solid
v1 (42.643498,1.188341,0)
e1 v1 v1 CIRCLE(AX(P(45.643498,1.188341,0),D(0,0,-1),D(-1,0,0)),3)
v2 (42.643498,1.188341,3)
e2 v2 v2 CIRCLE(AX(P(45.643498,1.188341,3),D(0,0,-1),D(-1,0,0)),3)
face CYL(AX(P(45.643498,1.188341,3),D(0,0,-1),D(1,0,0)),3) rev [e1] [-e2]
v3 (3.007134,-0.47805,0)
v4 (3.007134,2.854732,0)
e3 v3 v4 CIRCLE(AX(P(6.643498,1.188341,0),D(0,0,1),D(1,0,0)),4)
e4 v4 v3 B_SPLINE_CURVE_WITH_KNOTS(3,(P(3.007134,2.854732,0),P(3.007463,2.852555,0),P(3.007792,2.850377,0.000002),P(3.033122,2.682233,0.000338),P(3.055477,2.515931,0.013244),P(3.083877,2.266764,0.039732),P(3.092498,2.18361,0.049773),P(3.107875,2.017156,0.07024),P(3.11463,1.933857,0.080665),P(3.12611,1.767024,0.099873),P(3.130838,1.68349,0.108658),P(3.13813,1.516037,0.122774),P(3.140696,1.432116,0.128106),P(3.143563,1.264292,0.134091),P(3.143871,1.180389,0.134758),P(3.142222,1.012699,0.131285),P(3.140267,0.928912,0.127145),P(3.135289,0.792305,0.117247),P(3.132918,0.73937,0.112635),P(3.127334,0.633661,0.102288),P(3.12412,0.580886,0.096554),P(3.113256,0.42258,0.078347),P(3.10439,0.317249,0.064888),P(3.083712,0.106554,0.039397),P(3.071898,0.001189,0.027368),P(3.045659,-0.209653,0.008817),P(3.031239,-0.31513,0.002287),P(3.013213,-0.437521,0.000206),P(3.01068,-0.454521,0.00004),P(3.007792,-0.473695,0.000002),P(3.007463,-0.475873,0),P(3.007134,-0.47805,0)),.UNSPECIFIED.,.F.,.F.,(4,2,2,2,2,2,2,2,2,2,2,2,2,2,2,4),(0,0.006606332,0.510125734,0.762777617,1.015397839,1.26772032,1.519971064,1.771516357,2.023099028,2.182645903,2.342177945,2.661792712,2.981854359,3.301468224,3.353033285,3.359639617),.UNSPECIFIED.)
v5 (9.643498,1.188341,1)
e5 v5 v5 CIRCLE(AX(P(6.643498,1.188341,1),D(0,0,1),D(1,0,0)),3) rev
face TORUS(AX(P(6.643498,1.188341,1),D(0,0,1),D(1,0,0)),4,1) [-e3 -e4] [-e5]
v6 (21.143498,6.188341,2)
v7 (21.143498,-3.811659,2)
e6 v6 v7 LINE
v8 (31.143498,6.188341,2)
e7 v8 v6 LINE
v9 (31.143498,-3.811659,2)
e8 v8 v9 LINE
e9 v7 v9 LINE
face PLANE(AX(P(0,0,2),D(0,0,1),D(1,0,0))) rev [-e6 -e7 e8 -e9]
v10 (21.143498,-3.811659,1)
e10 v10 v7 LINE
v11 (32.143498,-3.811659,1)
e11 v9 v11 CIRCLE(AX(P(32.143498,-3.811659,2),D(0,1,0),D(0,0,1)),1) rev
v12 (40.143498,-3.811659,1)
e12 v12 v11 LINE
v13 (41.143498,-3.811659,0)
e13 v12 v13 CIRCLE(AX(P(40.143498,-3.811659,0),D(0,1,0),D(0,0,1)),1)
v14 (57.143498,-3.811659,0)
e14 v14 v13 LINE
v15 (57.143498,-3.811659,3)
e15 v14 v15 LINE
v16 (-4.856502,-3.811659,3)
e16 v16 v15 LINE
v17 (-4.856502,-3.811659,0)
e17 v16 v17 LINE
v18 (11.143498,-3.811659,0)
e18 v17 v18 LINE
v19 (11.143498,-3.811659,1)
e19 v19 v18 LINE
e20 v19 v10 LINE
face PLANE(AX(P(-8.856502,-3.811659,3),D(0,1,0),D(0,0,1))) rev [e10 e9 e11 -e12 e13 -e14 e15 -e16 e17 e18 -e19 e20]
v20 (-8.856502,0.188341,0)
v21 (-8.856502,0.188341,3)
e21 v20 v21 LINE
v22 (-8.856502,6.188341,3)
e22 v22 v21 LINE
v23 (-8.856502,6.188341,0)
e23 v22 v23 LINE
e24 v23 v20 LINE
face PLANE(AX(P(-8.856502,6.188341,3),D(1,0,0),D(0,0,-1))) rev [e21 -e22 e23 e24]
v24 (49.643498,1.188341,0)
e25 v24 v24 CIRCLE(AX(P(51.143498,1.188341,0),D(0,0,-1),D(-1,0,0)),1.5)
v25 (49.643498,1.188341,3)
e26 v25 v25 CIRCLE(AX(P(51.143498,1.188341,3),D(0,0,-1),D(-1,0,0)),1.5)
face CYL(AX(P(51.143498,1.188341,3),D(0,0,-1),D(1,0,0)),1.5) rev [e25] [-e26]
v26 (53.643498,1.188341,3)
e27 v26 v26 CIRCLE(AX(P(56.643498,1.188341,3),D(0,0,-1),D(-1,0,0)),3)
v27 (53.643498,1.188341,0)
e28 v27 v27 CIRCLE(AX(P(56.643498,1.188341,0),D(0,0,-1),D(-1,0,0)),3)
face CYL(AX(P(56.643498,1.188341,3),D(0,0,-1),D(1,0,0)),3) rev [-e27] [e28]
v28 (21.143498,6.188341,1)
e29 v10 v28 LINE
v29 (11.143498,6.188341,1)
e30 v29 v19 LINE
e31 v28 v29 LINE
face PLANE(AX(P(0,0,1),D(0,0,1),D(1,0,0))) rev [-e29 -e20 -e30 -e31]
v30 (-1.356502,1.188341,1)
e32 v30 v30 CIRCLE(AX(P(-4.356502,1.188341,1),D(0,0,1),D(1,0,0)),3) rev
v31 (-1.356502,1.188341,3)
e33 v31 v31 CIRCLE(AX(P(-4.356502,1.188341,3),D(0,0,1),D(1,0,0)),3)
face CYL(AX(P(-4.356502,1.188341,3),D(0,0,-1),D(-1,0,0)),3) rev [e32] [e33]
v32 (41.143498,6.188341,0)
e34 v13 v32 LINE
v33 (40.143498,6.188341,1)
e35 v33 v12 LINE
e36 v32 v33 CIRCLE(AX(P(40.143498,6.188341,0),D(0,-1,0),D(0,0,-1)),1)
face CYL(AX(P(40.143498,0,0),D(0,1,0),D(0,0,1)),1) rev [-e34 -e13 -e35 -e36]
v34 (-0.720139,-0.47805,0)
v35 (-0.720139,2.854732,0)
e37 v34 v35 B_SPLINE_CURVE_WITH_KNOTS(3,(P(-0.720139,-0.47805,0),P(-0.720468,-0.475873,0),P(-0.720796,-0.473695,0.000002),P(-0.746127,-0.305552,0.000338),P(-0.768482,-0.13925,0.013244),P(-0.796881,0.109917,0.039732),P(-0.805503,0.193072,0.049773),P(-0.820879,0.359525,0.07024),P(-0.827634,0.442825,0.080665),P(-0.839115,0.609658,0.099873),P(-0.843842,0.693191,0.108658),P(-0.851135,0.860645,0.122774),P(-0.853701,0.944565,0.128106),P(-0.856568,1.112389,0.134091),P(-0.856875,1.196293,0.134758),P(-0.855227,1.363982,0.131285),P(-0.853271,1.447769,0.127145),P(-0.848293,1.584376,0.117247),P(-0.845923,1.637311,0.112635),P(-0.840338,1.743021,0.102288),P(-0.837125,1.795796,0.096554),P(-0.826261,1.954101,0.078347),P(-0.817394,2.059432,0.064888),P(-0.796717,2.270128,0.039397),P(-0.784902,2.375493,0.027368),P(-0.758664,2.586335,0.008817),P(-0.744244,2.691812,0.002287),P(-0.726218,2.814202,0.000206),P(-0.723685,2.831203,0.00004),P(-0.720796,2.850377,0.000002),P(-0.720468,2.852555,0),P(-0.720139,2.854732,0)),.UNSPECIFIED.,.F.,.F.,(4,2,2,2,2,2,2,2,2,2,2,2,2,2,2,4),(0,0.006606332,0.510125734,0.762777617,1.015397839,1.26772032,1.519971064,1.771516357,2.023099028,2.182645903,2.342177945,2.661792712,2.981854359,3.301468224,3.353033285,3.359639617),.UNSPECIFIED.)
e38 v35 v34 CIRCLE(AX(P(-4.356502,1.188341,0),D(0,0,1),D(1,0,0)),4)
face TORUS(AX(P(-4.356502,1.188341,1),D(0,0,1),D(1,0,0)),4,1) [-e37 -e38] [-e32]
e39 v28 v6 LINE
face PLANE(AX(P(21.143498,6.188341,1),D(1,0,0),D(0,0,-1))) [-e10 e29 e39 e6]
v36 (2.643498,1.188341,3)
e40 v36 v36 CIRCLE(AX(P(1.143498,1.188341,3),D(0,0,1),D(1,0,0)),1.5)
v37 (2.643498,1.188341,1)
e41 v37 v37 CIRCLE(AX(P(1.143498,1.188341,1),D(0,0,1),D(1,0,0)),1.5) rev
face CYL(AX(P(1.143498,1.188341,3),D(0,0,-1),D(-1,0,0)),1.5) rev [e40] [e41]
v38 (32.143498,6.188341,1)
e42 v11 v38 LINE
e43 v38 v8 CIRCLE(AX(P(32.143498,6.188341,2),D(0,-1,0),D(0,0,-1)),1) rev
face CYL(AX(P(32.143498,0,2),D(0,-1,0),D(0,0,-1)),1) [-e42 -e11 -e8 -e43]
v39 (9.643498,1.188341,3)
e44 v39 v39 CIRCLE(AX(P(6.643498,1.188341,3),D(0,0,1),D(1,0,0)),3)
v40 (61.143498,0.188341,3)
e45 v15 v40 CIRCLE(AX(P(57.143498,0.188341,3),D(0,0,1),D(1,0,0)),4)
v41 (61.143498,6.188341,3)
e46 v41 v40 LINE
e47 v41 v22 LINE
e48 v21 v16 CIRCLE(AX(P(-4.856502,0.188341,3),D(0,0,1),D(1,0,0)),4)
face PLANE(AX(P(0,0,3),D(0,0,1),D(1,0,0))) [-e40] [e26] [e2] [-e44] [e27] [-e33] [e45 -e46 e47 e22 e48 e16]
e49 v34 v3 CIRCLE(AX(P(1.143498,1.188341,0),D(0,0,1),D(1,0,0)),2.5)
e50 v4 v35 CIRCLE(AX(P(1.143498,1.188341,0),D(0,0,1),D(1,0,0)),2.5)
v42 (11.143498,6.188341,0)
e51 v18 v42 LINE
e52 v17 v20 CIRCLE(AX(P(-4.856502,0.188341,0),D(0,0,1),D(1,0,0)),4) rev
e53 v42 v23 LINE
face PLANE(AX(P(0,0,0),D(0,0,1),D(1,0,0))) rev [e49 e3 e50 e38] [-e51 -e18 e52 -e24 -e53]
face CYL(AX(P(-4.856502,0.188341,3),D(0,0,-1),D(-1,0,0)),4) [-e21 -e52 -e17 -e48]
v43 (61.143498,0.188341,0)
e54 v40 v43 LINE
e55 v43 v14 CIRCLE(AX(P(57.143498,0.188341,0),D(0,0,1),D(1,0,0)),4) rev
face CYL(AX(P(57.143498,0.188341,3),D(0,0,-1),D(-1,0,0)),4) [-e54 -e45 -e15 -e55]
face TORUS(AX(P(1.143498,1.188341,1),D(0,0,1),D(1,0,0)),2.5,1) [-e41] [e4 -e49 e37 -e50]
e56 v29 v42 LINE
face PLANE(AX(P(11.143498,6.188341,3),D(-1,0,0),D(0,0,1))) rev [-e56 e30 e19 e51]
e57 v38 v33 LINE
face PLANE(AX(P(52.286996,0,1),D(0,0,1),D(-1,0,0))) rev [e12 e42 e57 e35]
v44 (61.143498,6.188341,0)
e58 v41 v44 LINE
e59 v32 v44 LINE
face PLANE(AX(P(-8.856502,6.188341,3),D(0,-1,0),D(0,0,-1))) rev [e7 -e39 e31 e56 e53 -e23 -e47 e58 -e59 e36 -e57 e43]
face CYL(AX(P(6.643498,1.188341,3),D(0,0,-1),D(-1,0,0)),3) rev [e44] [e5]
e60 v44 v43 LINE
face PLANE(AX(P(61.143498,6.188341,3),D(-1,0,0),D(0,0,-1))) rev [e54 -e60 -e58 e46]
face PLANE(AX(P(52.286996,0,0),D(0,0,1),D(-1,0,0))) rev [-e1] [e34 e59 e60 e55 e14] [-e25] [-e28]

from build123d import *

# Parameters (mm, degrees)
SKETCH1_W           = 20
SKETCH1_H           = 10
SKETCH1_R           = 3
SKETCH1_R_2         = 1.5
BOSS_EXTRUDE1_DEPTH = 3
SKETCH2_W           = 10
SKETCH2_H           = 10
BOSS_EXTRUDE2_DEPTH = 2
SKETCH3_W           = 10
SKETCH3_H           = 10
BOSS_EXTRUDE3_DEPTH = 1
FILLET1_R           = 4
FILLET2_START       = -5
FILLET2_DEPTH       = 12
FILLET2_START_2     = -3.811659193
FILLET2_2_DEPTH     = 10
FILLET3_R           = 1


with BuildPart() as part:
    # Sketch1 → Boss-Extrude1 (new body)
    with BuildSketch(Plane.XY):
        with Locations((1.143497758, 1.188340807)):
            Rectangle(SKETCH1_W, SKETCH1_H)
        with Locations((-4.356502242, 1.188340807)):
            Circle(SKETCH1_R, mode=Mode.SUBTRACT)
        with Locations((6.643497758, 1.188340807)):
            Circle(SKETCH1_R, mode=Mode.SUBTRACT)
        with Locations((1.143497758, 1.188340807)):
            Circle(SKETCH1_R_2, mode=Mode.SUBTRACT)
    extrude(amount=BOSS_EXTRUDE1_DEPTH)

    # Sketch2 → Boss-Extrude2 (add)
    with BuildSketch(Plane.XY.offset(3)):
        with Locations((16.143497758, 1.188340807)):
            Rectangle(SKETCH2_W, SKETCH2_H)
    extrude(amount=-BOSS_EXTRUDE2_DEPTH)

    # Sketch3 → Boss-Extrude3 (add)
    with BuildSketch(Plane.XY.offset(3)):
        with Locations((26.143497758, 1.188340807)):
            Rectangle(SKETCH3_W, SKETCH3_H)
    extrude(amount=-BOSS_EXTRUDE3_DEPTH)


with BuildPart() as body_2:
    # Mirror3: mirrored copy
    add(part.part.mirror(Plane(origin=(26.143497758, 0, 0), x_dir=(0, 0, 1), z_dir=(1, 0, 0))))


with BuildPart() as part_1:
    add(part.part)

    # Combine1: union body 2
    add(body_2.part)

    # Fillet1
    fillet1_edges = [part_1.edges().sort_by_distance(p)[0] for p in [
        (61.143497758, -3.811659193, 1.5),
        (-8.856502242, -3.811659193, 1.5),
    ]]
    fillet(fillet1_edges, radius=FILLET1_R)

    # Fillet2: read off the stored shape, not the designer's step
    # Fillet2 outline → Fillet2 (cut)
    with BuildSketch(Plane(origin=(0, 0, 0), x_dir=(1, 0, 0), z_dir=(0, 1, 0)).offset(FILLET2_START)):
        with BuildLine():
            Line((31.143497758, -1), (31.143497758, -2))
            ThreePointArc((31.143497758, -2), (31.436390977, -1.292893219), (32.143497758, -1))
            Line((32.143497758, -1), (31.143497758, -1))
        make_face()
    extrude(amount=FILLET2_DEPTH, mode=Mode.SUBTRACT)

    # Fillet2 2 outline → Fillet2 2 (add)
    with BuildSketch(Plane(origin=(0, 0, 0), x_dir=(1, 0, 0), z_dir=(0, 1, 0)).offset(FILLET2_START_2)):
        with BuildLine():
            ThreePointArc((41.143497758, 0), (40.850604539, -0.707106781), (40.143497758, -1))
            Line((40.143497758, -1), (41.143497758, -1))
            Line((41.143497758, -1), (41.143497758, 0))
        make_face()
    extrude(amount=FILLET2_2_DEPTH)

    # Fillet3
    # the kernel refuses this fillet: 1 mm, written as the material it takes off along each edge
    with BuildSketch(Plane(origin=(-4.356502242, 1.188340807, 0), x_dir=(1, 0, 0), z_dir=(0, -1, 0))) as fillet3_piece_1:
        with BuildLine():
            CenterArc((3 + FILLET3_R, FILLET3_R), FILLET3_R, 180, 90)
            Line((3, FILLET3_R), (3, 0))
            Line((3, 0), (3 + FILLET3_R, 0))
        make_face()
    revolve(axis=Axis((-4.356502242, 1.188340807, 0), (0, 0, 1)), mode=Mode.SUBTRACT)
    with BuildSketch(Plane(origin=(6.643497758, 1.188340807, 0), x_dir=(1, 0, 0), z_dir=(0, -1, 0))) as fillet3_piece_2:
        with BuildLine():
            CenterArc((3 + FILLET3_R, FILLET3_R), FILLET3_R, 180, 90)
            Line((3, FILLET3_R), (3, 0))
            Line((3, 0), (3 + FILLET3_R, 0))
        make_face()
    revolve(axis=Axis((6.643497758, 1.188340807, 0), (0, 0, 1)), mode=Mode.SUBTRACT)
    with BuildSketch(Plane(origin=(1.143497758, 1.188340807, 0), x_dir=(1, 0, 0), z_dir=(0, -1, 0))) as fillet3_piece_3:
        with BuildLine():
            CenterArc((1.5 + FILLET3_R, FILLET3_R), FILLET3_R, 180, 90)
            Line((1.5, FILLET3_R), (1.5, 0))
            Line((1.5, 0), (1.5 + FILLET3_R, 0))
        make_face()
    revolve(axis=Axis((1.143497758, 1.188340807, 0), (0, 0, 1)), mode=Mode.SUBTRACT)


solid = part_1.part
